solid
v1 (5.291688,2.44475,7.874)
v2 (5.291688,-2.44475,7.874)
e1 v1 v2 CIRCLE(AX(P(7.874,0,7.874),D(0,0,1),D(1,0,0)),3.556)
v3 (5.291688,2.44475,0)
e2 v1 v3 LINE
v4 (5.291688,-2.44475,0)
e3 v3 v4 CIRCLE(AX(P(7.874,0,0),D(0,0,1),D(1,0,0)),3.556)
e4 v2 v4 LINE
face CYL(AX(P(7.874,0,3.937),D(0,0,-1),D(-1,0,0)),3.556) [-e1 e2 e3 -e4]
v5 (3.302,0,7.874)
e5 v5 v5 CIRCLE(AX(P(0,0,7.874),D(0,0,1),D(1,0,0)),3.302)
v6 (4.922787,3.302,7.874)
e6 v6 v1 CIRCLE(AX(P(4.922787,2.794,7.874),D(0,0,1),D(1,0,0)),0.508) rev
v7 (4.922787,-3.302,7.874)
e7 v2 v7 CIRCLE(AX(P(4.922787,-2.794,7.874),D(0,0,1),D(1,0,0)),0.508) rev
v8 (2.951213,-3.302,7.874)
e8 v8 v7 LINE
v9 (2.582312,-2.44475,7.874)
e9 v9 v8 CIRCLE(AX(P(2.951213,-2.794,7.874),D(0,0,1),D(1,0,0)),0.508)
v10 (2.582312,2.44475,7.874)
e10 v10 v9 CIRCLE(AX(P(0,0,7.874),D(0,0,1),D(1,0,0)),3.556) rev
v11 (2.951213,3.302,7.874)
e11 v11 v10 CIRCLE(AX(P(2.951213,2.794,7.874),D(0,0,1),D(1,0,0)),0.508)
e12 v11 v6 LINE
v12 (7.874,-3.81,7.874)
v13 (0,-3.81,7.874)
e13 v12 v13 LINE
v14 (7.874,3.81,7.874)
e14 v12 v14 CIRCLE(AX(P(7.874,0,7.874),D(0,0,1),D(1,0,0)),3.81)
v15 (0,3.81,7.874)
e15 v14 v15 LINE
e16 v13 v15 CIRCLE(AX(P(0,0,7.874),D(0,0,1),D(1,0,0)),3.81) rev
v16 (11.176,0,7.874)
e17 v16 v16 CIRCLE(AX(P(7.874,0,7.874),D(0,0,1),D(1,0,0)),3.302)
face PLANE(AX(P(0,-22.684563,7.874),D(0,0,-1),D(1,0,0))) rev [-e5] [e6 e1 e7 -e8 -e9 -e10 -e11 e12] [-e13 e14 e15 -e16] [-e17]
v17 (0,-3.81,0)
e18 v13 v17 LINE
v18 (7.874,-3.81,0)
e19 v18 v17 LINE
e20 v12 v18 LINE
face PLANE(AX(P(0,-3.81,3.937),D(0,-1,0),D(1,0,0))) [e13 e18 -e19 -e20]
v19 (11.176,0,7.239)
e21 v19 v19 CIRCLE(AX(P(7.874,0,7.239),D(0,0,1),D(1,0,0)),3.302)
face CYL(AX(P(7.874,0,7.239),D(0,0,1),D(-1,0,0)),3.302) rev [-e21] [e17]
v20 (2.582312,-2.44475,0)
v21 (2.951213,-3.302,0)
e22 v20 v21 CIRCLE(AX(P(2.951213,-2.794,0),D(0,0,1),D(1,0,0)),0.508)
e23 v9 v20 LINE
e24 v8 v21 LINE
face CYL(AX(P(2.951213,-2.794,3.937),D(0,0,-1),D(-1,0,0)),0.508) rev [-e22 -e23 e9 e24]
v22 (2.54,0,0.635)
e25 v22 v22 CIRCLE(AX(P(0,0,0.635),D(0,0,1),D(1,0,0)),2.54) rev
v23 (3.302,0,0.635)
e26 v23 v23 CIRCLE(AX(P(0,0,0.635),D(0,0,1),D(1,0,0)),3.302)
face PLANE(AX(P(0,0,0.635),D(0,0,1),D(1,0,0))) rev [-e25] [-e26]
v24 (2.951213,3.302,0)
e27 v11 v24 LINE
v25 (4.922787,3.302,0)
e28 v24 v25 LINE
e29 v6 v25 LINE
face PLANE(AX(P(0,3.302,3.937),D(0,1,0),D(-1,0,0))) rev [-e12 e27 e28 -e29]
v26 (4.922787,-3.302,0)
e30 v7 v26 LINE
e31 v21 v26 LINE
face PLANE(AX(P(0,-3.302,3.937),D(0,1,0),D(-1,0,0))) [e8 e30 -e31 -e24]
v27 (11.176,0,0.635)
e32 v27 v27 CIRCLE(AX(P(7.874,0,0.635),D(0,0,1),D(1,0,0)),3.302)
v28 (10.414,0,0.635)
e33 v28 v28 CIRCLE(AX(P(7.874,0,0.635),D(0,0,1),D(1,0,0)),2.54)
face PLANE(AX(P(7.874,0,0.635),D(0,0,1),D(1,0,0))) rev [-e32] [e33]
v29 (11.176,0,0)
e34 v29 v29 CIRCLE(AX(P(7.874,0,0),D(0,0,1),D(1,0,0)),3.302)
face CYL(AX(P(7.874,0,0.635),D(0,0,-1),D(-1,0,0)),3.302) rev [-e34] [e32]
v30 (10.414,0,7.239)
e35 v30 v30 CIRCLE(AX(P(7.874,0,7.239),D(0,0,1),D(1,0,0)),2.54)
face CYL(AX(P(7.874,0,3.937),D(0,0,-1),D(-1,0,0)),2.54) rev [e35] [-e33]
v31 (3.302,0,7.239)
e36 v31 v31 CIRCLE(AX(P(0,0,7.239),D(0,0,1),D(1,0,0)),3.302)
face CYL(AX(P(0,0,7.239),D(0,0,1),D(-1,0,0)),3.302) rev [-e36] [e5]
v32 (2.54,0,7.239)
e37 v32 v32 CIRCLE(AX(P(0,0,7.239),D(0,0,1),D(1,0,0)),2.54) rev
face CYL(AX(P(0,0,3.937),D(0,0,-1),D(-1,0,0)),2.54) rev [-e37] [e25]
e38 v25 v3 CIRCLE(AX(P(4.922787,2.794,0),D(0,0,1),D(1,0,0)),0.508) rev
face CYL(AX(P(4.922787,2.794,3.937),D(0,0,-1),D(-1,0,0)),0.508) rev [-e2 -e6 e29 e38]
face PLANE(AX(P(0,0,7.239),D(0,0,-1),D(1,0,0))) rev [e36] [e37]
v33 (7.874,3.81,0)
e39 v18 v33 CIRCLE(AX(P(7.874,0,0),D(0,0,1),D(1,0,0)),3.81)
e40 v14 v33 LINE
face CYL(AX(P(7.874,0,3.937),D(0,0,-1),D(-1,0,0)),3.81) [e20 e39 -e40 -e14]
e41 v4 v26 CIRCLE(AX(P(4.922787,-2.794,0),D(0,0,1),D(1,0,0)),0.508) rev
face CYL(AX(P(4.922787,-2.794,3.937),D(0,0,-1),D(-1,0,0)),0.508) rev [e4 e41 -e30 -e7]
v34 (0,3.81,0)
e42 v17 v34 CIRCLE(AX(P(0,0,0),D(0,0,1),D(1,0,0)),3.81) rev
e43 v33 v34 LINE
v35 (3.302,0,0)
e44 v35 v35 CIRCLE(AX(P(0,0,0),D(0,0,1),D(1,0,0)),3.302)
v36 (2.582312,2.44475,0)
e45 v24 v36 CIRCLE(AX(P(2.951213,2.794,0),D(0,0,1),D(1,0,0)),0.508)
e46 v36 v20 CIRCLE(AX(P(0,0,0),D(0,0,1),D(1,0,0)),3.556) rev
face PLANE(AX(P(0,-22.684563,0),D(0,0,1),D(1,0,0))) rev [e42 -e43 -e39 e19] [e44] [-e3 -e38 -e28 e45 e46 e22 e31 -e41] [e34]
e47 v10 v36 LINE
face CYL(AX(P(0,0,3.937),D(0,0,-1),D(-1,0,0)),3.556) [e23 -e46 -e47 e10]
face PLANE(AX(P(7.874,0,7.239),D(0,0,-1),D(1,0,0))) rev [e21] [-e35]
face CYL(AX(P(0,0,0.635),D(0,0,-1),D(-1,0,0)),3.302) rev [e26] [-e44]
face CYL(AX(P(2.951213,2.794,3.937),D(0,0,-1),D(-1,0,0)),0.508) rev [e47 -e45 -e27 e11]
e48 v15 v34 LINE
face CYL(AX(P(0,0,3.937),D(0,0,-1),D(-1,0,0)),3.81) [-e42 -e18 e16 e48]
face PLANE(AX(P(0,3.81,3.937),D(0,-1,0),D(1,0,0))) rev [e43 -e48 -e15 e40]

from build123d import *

# Parameters (mm, degrees)
SKETCH1_R                   = 3.302
SKETCH1_R_2                 = 2.54
BOSS_EXTRUDE1_DEPTH         = 3.937
BODY_MOVE_COPY1_OUTLINE_R   = 2.54
BODY_MOVE_COPY1_DEPTH       = 3.937
BODY_MOVE_COPY1_2_OUTLINE_R = 2.54
BODY_MOVE_COPY1_2_DEPTH     = 3.937
SKETCH2_R                   = 3.302
CUT_EXTRUDE1_DEPTH          = 0.635


# Read off the part's stored shape, not the designer's step: Body-Move/Copy1
with BuildPart() as part:
    # Sketch1 → Boss-Extrude1 (new body)
    # profile 1 of 4: a face of its own
    with BuildSketch(Plane.XY):
        with BuildLine():
            Line((3.937, -3.81), (7.874, -3.81))
            ThreePointArc((7.874, -3.81), (11.684, 0), (7.874, 3.81))
            Line((7.874, 3.81), (3.937, 3.81))
            Line((3.937, 3.81), (3.937, 3.302))
            Line((3.937, 3.302), (4.92278669, 3.302))
            ThreePointArc((4.92278669, 3.302), (5.389414486, 2.994804631), (5.291688354, 2.44475))
            ThreePointArc((5.291688354, 2.44475), (4.318, 0), (5.291688354, -2.44475))
            ThreePointArc((5.291688354, -2.44475), (5.389414486, -2.994804631), (4.92278669, -3.302))
            Line((4.92278669, -3.302), (3.937, -3.302))
            Line((3.937, -3.302), (3.937, -3.81))
        make_face()
        with Locations((7.874, 0)):
            Circle(SKETCH1_R, mode=Mode.SUBTRACT)
    # profile 2 of 4: a face of its own
    with BuildSketch(Plane.XY):
        with Locations((7.874, 0)):
            Circle(SKETCH1_R)
        with Locations((7.874, 0)):
            Circle(SKETCH1_R_2, mode=Mode.SUBTRACT)
    # profile 3 of 4: a face of its own
    with BuildSketch(Plane.XY):
        with BuildLine():
            Line((-7.874, -3.81), (-3.937, -3.81))
            Line((-3.937, -3.81), (-3.937, -3.302))
            Line((-3.937, -3.302), (-4.92278669, -3.302))
            ThreePointArc((-4.92278669, -3.302), (-5.389414486, -2.994804631), (-5.291688354, -2.44475))
            ThreePointArc((-5.291688354, -2.44475), (-4.318, 0), (-5.291688354, 2.44475))
            ThreePointArc((-5.291688354, 2.44475), (-5.389414486, 2.994804631), (-4.92278669, 3.302))
            Line((-4.92278669, 3.302), (-3.937, 3.302))
            Line((-3.937, 3.302), (-3.937, 3.81))
            Line((-3.937, 3.81), (-7.874, 3.81))
            ThreePointArc((-7.874, 3.81), (-11.684, 0), (-7.874, -3.81))
        make_face()
        with Locations((-7.874, 0)):
            Circle(SKETCH1_R, mode=Mode.SUBTRACT)
    # profile 4 of 4: a face of its own
    with BuildSketch(Plane.XY):
        with Locations((-7.874, 0)):
            Circle(SKETCH1_R)
        with Locations((-7.874, 0)):
            Circle(SKETCH1_R_2, mode=Mode.SUBTRACT)
    extrude(amount=BOSS_EXTRUDE1_DEPTH)

    # Body-Move/Copy1 outline → Body-Move/Copy1 (cut)
    with BuildSketch(Plane.XY):
        with BuildLine():
            ThreePointArc((-7.874, 3.81), (-11.684, 0), (-7.874, -3.81))
            Line((-7.874, -3.81), (-3.937, -3.81))
            Line((-3.937, -3.81), (-3.937, -3.302))
            Line((-3.937, -3.302), (-4.92278669, -3.302))
            ThreePointArc((-4.92278669, -3.302), (-5.389414486, -2.994804631), (-5.291688354, -2.44475))
            ThreePointArc((-5.291688354, -2.44475), (-4.318, 0), (-5.291688354, 2.44475))
            ThreePointArc((-5.291688354, 2.44475), (-5.389414486, 2.994804631), (-4.92278669, 3.302))
            Line((-4.92278669, 3.302), (-3.937, 3.302))
            Line((-3.937, 3.302), (-3.937, 3.81))
            Line((-3.937, 3.81), (-7.874, 3.81))
        make_face()
        with Locations((-7.874, 0)):
            Circle(BODY_MOVE_COPY1_OUTLINE_R, mode=Mode.SUBTRACT)
    extrude(amount=BODY_MOVE_COPY1_DEPTH, mode=Mode.SUBTRACT)


with BuildPart() as body_2:
    # Body-Move_Copy1 2 outline → Body-Move_Copy1 2 (new body)
    with BuildSketch(Plane.XY):
        with BuildLine():
            ThreePointArc((0, 3.81), (-3.81, 0), (0, -3.81))
            Line((0, -3.81), (3.937, -3.81))
            Line((3.937, -3.81), (3.937, -3.302))
            Line((3.937, -3.302), (2.95121331, -3.302))
            ThreePointArc((2.95121331, -3.302), (2.484585514, -2.994804631), (2.582311646, -2.44475))
            ThreePointArc((2.582311646, -2.44475), (3.556, 0), (2.582311646, 2.44475))
            ThreePointArc((2.582311646, 2.44475), (2.484585514, 2.994804631), (2.95121331, 3.302))
            Line((2.95121331, 3.302), (3.937, 3.302))
            Line((3.937, 3.302), (3.937, 3.81))
            Line((3.937, 3.81), (0, 3.81))
        make_face()
        Circle(BODY_MOVE_COPY1_2_OUTLINE_R, mode=Mode.SUBTRACT)
    extrude(amount=BODY_MOVE_COPY1_2_DEPTH)


with BuildPart() as cut_extrude1_tool:
    # Sketch2 → Cut-Extrude1 (new body)
    with BuildSketch(Plane.XY):
        with Locations((7.874, 0)):
            Circle(SKETCH2_R)
        Circle(SKETCH2_R)
    extrude(amount=CUT_EXTRUDE1_DEPTH)


with BuildPart() as part_1:
    add(part.part)

    # Cut-Extrude1: cut by cut_extrude1_tool
    add(cut_extrude1_tool.part, mode=Mode.SUBTRACT)


with BuildPart() as body_2_1:
    add(body_2.part)

    # Cut-Extrude1: cut by cut_extrude1_tool
    add(cut_extrude1_tool.part, mode=Mode.SUBTRACT)


with BuildPart() as part_2:
    add(part_1.part)

    # Combine1: union body 2
    add(body_2_1.part)

    # Mirror3: part across plane


with BuildPart() as part_3:
    add(part_2.part)
    add(part_2.part.mirror(Plane.XY.offset(3.937)))


solid = part_3.part
